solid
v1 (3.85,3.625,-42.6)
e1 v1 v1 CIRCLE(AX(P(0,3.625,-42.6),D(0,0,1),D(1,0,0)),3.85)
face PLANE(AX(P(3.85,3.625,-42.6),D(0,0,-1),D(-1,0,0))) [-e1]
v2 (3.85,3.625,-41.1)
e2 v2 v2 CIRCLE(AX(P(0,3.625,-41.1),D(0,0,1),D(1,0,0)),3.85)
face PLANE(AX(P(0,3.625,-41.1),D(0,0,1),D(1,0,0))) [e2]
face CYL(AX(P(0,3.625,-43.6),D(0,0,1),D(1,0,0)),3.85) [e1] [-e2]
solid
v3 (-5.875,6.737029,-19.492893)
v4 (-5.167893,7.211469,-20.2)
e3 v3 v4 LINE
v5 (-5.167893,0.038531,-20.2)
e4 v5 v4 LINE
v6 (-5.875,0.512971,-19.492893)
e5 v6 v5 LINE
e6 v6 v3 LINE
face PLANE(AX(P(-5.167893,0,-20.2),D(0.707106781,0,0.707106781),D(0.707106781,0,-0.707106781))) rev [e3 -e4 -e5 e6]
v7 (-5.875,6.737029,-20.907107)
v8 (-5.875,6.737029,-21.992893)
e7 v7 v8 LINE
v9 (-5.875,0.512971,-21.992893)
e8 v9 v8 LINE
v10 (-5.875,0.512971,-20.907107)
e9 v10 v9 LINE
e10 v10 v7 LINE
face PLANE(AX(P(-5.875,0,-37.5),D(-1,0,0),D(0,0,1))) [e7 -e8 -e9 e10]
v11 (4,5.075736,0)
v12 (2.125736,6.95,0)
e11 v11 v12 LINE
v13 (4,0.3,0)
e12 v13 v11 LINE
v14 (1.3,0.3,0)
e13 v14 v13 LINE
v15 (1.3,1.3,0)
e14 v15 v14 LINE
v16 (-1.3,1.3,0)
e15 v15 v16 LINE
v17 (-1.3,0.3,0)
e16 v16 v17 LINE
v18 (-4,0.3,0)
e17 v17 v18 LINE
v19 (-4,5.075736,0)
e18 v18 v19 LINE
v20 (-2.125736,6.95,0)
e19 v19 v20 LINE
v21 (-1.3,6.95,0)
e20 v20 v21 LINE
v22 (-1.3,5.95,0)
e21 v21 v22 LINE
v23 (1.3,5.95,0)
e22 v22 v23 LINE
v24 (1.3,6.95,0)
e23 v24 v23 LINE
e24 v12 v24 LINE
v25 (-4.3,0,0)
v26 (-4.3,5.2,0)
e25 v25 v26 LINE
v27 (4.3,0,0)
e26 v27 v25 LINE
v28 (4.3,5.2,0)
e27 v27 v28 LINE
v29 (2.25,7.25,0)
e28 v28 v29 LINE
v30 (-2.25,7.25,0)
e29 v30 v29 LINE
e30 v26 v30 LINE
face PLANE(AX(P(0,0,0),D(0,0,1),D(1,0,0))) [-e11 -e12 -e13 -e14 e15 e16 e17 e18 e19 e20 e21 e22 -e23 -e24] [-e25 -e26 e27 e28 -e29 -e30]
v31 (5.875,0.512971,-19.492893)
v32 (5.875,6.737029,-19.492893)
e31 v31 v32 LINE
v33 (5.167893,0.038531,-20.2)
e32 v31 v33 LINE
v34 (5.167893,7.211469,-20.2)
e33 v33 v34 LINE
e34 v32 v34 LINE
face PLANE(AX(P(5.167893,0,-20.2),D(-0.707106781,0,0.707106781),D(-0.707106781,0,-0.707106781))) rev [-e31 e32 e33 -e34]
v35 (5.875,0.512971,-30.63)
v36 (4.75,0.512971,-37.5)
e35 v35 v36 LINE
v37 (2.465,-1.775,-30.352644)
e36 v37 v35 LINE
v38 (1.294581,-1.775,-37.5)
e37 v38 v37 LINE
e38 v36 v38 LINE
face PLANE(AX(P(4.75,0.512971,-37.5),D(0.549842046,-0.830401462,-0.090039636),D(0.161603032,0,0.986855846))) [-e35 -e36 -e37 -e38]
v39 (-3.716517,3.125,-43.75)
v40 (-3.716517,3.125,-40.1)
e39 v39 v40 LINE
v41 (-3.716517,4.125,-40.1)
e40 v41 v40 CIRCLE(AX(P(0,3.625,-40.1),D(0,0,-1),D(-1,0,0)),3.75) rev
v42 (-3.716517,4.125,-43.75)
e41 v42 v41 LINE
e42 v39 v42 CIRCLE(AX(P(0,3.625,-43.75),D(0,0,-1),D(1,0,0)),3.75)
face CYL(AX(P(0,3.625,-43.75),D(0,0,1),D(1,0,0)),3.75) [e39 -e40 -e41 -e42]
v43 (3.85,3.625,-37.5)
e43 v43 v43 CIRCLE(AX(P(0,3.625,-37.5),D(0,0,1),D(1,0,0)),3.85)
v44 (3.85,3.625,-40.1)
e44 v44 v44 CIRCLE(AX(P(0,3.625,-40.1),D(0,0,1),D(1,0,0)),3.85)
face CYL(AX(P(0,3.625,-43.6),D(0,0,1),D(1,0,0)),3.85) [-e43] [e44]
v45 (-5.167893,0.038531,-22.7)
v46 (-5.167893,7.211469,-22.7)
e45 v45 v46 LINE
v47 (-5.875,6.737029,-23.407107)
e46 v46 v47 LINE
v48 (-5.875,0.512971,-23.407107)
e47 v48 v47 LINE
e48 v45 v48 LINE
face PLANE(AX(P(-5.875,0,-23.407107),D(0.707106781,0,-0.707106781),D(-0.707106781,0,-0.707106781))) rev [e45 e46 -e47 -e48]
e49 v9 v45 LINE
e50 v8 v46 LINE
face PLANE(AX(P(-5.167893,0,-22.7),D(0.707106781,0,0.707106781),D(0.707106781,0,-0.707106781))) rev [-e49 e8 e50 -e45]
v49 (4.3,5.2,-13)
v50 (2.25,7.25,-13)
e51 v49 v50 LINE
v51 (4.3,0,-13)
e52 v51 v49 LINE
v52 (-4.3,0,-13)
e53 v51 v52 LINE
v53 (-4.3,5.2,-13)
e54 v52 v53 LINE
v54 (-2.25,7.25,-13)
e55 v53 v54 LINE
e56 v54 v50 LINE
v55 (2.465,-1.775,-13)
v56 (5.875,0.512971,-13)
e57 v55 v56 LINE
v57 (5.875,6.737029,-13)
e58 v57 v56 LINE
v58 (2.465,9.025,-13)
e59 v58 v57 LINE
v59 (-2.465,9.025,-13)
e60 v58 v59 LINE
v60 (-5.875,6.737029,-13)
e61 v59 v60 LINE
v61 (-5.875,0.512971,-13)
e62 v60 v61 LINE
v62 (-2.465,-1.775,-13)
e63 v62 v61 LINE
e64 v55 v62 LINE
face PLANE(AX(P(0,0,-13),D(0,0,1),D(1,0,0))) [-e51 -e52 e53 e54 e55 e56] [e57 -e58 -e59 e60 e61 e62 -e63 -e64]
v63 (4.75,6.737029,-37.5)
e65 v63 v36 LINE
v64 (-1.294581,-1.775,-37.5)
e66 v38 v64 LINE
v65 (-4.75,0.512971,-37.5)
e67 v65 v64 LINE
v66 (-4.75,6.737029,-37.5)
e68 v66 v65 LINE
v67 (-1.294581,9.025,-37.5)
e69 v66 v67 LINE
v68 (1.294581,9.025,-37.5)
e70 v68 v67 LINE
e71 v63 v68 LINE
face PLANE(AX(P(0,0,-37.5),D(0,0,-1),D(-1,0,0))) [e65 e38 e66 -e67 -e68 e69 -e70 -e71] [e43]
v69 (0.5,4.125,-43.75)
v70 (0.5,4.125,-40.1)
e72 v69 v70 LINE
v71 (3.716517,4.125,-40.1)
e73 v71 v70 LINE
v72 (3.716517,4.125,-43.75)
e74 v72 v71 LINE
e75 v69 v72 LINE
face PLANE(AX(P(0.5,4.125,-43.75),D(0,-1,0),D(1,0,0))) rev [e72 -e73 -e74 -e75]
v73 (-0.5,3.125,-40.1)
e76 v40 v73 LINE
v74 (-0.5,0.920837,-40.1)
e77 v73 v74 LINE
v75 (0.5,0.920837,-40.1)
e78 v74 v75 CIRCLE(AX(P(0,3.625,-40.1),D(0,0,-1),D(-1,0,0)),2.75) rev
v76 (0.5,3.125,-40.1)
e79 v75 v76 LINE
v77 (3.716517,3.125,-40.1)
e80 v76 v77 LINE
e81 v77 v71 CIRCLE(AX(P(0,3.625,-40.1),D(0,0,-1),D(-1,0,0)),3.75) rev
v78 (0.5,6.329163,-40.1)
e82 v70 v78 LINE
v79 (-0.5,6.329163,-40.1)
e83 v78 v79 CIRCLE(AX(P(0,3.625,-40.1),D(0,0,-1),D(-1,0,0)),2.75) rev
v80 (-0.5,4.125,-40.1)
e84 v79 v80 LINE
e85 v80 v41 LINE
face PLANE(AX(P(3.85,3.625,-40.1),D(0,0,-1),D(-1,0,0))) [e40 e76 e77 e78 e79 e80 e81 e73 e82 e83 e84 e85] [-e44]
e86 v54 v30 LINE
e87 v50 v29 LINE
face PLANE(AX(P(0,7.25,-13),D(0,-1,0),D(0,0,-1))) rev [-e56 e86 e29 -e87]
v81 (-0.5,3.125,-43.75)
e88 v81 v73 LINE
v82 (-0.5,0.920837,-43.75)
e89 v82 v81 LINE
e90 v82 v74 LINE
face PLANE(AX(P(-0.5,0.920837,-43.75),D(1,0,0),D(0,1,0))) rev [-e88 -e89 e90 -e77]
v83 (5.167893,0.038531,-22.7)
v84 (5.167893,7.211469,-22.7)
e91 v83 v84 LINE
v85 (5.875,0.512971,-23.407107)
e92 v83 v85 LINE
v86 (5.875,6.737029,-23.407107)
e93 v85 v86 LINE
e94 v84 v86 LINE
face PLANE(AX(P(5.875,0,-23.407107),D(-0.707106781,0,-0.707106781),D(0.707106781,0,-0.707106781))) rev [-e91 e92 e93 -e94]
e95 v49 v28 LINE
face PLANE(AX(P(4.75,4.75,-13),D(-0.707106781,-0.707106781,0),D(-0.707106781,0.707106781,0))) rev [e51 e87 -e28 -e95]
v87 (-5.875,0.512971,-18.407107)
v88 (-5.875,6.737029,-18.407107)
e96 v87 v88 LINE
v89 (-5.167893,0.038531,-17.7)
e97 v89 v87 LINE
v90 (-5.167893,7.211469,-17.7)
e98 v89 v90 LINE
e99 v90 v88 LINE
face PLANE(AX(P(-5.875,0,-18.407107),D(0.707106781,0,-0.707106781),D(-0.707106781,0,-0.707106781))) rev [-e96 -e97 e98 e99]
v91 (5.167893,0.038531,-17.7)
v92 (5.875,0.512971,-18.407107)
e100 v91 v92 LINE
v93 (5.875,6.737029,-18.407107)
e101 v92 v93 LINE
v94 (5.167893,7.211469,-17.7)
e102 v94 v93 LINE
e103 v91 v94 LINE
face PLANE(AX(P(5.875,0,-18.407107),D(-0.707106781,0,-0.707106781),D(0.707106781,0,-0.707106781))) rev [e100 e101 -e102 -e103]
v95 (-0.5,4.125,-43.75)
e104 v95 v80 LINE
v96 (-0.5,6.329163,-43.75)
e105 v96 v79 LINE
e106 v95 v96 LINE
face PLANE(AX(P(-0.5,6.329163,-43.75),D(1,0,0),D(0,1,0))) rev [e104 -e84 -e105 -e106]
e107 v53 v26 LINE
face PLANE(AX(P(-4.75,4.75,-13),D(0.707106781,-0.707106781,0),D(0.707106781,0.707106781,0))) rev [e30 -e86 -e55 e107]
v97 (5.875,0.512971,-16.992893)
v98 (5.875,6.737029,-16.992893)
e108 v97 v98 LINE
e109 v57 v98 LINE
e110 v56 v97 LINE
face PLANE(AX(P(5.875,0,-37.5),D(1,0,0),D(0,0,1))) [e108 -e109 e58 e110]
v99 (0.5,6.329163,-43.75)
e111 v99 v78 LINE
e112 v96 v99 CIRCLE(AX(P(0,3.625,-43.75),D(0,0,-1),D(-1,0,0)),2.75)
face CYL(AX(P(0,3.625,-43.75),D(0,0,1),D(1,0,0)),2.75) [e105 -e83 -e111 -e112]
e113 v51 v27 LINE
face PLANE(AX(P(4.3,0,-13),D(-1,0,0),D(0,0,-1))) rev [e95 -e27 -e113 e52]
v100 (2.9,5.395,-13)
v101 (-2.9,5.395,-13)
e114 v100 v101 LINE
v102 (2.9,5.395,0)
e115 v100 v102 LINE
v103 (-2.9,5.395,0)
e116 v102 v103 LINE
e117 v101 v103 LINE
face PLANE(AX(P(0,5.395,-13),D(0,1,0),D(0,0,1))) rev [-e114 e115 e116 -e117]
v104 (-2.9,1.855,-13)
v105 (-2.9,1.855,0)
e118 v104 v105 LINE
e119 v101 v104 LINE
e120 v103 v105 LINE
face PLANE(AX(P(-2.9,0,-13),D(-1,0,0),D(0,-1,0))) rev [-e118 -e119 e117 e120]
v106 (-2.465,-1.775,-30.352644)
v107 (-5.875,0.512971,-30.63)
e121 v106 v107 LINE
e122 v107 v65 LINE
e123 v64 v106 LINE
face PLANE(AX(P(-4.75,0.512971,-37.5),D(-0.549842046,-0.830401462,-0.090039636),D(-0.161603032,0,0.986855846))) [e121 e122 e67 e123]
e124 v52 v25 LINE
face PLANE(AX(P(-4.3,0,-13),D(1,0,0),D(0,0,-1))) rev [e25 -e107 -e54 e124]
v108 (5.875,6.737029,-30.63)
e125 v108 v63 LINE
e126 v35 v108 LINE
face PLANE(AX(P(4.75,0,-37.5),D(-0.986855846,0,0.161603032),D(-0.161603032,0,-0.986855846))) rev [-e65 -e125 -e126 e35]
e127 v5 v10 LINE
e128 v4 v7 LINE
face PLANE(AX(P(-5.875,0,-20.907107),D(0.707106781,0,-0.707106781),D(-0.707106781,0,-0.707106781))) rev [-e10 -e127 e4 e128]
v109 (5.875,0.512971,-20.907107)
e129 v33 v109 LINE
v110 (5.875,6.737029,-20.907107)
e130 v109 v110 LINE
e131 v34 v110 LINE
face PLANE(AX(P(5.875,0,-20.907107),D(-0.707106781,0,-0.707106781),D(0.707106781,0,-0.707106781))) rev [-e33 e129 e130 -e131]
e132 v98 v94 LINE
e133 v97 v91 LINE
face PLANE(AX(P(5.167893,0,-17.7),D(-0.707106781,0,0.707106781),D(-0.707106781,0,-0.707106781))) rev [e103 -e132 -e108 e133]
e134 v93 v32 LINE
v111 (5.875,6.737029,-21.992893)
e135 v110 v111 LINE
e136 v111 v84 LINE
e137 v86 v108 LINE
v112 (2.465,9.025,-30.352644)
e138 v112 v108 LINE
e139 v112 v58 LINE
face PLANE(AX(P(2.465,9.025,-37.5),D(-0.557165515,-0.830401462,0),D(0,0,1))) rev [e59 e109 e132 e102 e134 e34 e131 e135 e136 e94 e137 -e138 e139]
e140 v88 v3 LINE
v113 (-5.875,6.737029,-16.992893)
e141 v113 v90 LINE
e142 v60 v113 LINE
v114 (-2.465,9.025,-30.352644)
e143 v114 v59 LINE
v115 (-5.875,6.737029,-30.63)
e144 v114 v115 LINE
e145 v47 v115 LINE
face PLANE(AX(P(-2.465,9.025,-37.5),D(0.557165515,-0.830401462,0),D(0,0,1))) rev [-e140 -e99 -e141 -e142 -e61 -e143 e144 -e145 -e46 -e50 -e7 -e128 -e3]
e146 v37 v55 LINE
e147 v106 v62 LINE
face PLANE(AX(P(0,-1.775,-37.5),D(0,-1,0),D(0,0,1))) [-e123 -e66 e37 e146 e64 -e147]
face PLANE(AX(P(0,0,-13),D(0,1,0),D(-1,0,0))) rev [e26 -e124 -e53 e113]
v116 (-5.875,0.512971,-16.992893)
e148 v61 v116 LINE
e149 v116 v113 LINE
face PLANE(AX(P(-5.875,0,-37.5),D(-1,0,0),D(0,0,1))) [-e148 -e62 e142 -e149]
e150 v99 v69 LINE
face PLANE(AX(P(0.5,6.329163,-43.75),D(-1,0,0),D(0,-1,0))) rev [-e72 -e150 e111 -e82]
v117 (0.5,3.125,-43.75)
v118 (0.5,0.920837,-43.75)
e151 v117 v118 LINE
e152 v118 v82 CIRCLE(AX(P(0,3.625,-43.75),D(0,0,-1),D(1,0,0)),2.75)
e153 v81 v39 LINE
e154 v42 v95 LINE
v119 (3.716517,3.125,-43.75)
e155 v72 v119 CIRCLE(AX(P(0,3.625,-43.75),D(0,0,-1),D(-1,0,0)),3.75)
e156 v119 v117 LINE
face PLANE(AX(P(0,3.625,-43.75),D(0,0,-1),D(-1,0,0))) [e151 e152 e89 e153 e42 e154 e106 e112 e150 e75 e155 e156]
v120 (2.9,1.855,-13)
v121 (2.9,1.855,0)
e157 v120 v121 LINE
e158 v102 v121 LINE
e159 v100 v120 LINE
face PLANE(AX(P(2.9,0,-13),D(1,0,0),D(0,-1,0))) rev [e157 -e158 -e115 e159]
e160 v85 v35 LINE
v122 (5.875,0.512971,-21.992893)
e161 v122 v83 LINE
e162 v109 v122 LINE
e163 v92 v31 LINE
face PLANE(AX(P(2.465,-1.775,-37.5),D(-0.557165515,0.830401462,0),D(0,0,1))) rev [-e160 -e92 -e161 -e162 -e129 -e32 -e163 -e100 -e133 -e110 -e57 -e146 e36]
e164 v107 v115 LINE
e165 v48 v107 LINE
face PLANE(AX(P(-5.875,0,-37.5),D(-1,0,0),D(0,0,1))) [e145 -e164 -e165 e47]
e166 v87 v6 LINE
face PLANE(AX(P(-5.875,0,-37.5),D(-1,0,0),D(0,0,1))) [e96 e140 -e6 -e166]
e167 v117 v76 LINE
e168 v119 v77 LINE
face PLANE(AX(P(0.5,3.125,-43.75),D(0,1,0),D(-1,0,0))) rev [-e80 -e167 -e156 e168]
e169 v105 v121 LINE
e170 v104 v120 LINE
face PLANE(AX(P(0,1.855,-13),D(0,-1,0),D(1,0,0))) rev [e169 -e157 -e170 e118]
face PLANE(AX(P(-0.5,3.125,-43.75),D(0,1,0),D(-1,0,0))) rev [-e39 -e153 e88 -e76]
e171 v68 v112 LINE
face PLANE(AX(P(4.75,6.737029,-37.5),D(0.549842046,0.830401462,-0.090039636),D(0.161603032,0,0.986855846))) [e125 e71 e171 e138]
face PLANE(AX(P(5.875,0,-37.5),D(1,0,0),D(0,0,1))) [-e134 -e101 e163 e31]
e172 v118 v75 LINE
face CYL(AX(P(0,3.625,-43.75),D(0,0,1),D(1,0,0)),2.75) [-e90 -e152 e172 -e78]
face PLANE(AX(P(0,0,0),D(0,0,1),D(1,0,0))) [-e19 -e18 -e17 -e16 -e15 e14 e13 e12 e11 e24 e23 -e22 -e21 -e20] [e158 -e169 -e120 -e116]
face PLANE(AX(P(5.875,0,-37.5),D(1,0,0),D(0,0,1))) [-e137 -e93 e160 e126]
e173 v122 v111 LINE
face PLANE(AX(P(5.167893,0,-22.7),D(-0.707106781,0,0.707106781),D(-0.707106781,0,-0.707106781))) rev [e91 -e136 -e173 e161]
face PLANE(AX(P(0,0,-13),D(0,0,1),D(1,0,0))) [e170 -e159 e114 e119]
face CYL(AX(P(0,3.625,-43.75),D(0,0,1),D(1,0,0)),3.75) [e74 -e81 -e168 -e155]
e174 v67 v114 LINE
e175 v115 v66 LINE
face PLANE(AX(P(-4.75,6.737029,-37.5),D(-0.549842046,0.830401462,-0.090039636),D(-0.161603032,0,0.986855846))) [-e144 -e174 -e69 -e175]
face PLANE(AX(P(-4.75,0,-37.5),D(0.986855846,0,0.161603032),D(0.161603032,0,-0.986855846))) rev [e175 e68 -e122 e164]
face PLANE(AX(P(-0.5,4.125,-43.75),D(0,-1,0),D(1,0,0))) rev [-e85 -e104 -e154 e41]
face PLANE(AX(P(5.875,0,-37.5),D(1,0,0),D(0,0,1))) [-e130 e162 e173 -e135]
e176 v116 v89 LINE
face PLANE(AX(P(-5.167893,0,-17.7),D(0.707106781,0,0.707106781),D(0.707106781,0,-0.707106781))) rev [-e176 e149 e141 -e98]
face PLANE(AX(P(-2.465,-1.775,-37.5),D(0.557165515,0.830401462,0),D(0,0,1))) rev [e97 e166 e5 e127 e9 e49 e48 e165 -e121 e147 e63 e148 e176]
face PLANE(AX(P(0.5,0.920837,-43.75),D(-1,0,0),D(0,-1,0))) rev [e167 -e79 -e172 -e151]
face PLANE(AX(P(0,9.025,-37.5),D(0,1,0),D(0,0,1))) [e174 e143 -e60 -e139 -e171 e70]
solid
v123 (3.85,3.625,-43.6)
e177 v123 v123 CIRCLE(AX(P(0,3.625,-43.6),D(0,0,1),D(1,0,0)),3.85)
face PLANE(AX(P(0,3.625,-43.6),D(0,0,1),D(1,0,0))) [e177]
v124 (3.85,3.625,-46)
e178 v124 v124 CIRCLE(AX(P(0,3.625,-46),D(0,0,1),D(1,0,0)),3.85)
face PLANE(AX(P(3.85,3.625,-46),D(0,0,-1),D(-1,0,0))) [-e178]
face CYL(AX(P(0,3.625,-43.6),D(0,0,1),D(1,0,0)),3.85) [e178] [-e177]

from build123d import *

# Parameters (mm, degrees)
SKETCH1_W           = 1.3
SKETCH1_H           = 0.555
BOSS_EXTRUDE1_DEPTH = 13
SKETCH3_W           = 2.9
SKETCH3_H           = 1.77
BOSS_EXTRUDE2_DEPTH = 24.5
CUT_EXTRUDE1_DEPTH  = 40.015589833
CHAMFER1_SIZE       = 3.41
CHAMFER1_SIZE_2     = 2.287970931
SKETCH7_W           = 3.85
SKETCH7_H           = 2.6
SKETCH7_H_2         = 1.5
SKETCH7_H_3         = 2.4
BOSS_EXTRUDE3_DEPTH = 6.25


with BuildPart() as part:
    # Sketch1 → Boss-Extrude1 (new body)
    with BuildSketch(Plane.XY):
        Polygon((-1.3, 0.3), (-1.3, 1.3), (-1.3, 1.855), (-2.9, 1.855), (-2.9, 5.395), (-1.3, 5.395), (-1.3, 5.95), (-1.3, 6.95), (-2.125735931, 6.95), (-4, 5.075735931), (-4, 0.3), align=None)
        with Locations((-0.65, 1.5775)):
            Rectangle(SKETCH1_W, SKETCH1_H)
        Polygon((-4.3, 0), (0, 0), (0, 1.3), (-1.3, 1.3), (-1.3, 0.3), (-4, 0.3), (-4, 5.075735931), (-2.125735931, 6.95), (-1.3, 6.95), (-1.3, 5.95), (0, 5.95), (0, 7.25), (-2.25, 7.25), (-4.3, 5.2), align=None)
        with Locations((-0.65, 5.6725)):
            Rectangle(SKETCH1_W, SKETCH1_H)
    extrude(amount=-BOSS_EXTRUDE1_DEPTH)

    # Mirror1: part across plane


with BuildPart() as part_1:
    add(part.part)
    add(part.part.mirror(Plane(origin=(0, 0, -13), x_dir=(0, 0, 1), z_dir=(-1, 0, 0))))

    # Sketch3 → Boss-Extrude2 (add)
    with BuildSketch(Plane(origin=(0, 0, -13), x_dir=(-1, 0, 0), z_dir=(0, 0, -1))):
        with Locations((1.45, 4.51)):
            Rectangle(SKETCH3_W, SKETCH3_H)
        Polygon((2.25, 7.25), (0, 7.25), (0, 5.395), (2.9, 5.395), (2.9, 3.625), (4.3, 3.625), (4.3, 5.2), align=None)
        Polygon((3.043750454, 9.025), (0, 9.025), (0, 7.25), (2.25, 7.25), (4.3, 5.2), (4.3, 3.625), (5.875, 3.625), (5.875, 7.125), (5.875, 9.025), align=None)
    extrude(amount=BOSS_EXTRUDE2_DEPTH)

    # Sketch4 → Cut-Extrude1 (cut, through all)
    with BuildSketch(Plane(origin=(0, 9.025, 0), x_dir=(1, 0, 0), z_dir=(0, 1, 0))):
        Polygon((-4.75, 37.5), (-5.875, 30.63), (-5.875, 37.5), align=None)
        Polygon((-5.875, 23.407106781), (-5.167893219, 22.7), (-5.875, 21.992893219), align=None)
        Polygon((-5.167893219, 20.2), (-5.875, 19.492893219), (-5.875, 20.907106781), align=None)
        Polygon((-5.167893219, 17.7), (-5.875, 16.992893219), (-5.875, 18.407106781), align=None)
    extrude(amount=-CUT_EXTRUDE1_DEPTH, mode=Mode.SUBTRACT)

    # Chamfer1
    # the kernel refuses this chamfer: 3.41, 2.287970931 mm, written as the material it takes off along each edge
    with BuildSketch(Plane(origin=(-5.875, 9.025, -4.189784247), x_dir=(0.9997674455612761, 0.021565129164482656, 0), z_dir=(0, 0, -1))) as chamfer1_piece_1:
        Polygon((CHAMFER1_SIZE * 0.999767445561, CHAMFER1_SIZE * 0.0215651291645), (-CHAMFER1_SIZE_2 * 0.0215651291646, CHAMFER1_SIZE_2 * 0.999767445568), (0, 0), align=None)
    extrude(amount=21.613324726, mode=Mode.SUBTRACT)
    with BuildSketch(Plane(origin=(-5.875, 9.025, -14.596891028), x_dir=(0.9997674455612761, 0.021565129164482656, 0), z_dir=(0, 0, -1))) as chamfer1_piece_2:
        Polygon((CHAMFER1_SIZE * 0.999767445561, CHAMFER1_SIZE * 0.0215651291645), (-CHAMFER1_SIZE_2 * 0.0215651291646, CHAMFER1_SIZE_2 * 0.999767445568), (0, 0), align=None)
    extrude(amount=24.843324726, mode=Mode.SUBTRACT)
    with BuildSketch(Plane(origin=(-3.326242426, 9.025, -46.194412918), x_dir=(0.986626348001283, 0.021565129164482656, 0.1615654500002101), z_dir=(-0.16160303150249725, 0, 0.9868558457085832))) as chamfer1_piece_3:
        Polygon((CHAMFER1_SIZE * 0.999767445561, -CHAMFER1_SIZE * 0.0215651291645), (-CHAMFER1_SIZE_2 * 0.0215651291646, -CHAMFER1_SIZE_2 * 0.999767445568), (0, 0), align=None)
    extrude(amount=24.581934577, mode=Mode.SUBTRACT)


with BuildPart() as body_2:
    # Split1: the piece on the far side of the plane
    add(part_1.part)
    split(bisect_by=Plane.XY.offset(-13), keep=Keep.BOTTOM)

    # Mirror9: body 2 across plane


with BuildPart() as part_2:
    add(part_1.part)

    # Split1
    split(bisect_by=Plane.XY.offset(-13), keep=Keep.TOP)


with BuildPart() as body_2_1:
    add(body_2.part)
    add(body_2.part.mirror(Plane(origin=(0, 0, -37.5), x_dir=(0, 0, 1), z_dir=(-1, 0, 0))))

    # Mirror10: body 2 across plane


with BuildPart() as body_2_2:
    add(body_2_1.part)
    add(body_2_1.part.mirror(Plane(origin=(0, 3.625, -37.5), x_dir=(0, 0, 1), z_dir=(0, 1, 0))))

    # Combine1: union part
    add(part_2.part)

    # Sketch7 → Revolve1 (revolve)
    with BuildSketch(Plane(origin=(0, 3.625, 0), x_dir=(1, 0, 0), z_dir=(0, 1, 0))):
        with Locations((1.925, 38.8)):
            Rectangle(SKETCH7_W, SKETCH7_H)
        with Locations((1.925, 41.85)):
            Rectangle(SKETCH7_W, SKETCH7_H_2)
        with Locations((1.925, 44.8)):
            Rectangle(SKETCH7_W, SKETCH7_H_3)
    revolve(axis=Axis((0, 3.625, -43.6), (0, 0, -1)))


with BuildPart() as revolve1_piece_1:
    # of the separate pieces the step leaves, piece 1, a body of its own (revolve1_pieces)
    add(body_2_2.part.solids().sort_by_distance((-5.875, 6.737029069, -13))[0])

    # Sketch5 → Boss-Extrude3 (add)
    with BuildSketch(Plane(origin=(0, 0, -37.5), x_dir=(-1, 0, 0), z_dir=(0, 0, -1))):
        with BuildLine():
            Line((-0.5, 6.329163457), (-0.5, 4.125))
            Line((-0.5, 4.125), (-3.716517187, 4.125))
            ThreePointArc((-3.716517187, 4.125), (-3.75, 3.625), (-3.716517187, 3.125))
            Line((-3.716517187, 3.125), (-0.5, 3.125))
            Line((-0.5, 3.125), (-0.5, 0.920836543))
            ThreePointArc((-0.5, 0.920836543), (0, 0.875), (0.5, 0.920836543))
            Line((0.5, 0.920836543), (0.5, 3.125))
            Line((0.5, 3.125), (3.716517187, 3.125))
            ThreePointArc((3.716517187, 3.125), (3.75, 3.625), (3.716517187, 4.125))
            Line((3.716517187, 4.125), (0.5, 4.125))
            Line((0.5, 4.125), (0.5, 6.329163457))
            ThreePointArc((0.5, 6.329163457), (0, 6.375), (-0.5, 6.329163457))
        make_face()
    extrude(amount=BOSS_EXTRUDE3_DEPTH)


with BuildPart() as revolve1_piece_2:
    # of the separate pieces the step leaves, piece 2, a body of its own (revolve1_pieces)
    add(body_2_2.part.solids().sort_by_distance((3.85, 3.625, -43.6))[0])


with BuildPart() as revolve1_piece_3:
    # of the separate pieces the step leaves, piece 3, a body of its own (revolve1_pieces)
    add(body_2_2.part.solids().sort_by_distance((3.85, 3.625, -41.1))[0])


solid = Compound([revolve1_piece_1.part, revolve1_piece_2.part, revolve1_piece_3.part])
